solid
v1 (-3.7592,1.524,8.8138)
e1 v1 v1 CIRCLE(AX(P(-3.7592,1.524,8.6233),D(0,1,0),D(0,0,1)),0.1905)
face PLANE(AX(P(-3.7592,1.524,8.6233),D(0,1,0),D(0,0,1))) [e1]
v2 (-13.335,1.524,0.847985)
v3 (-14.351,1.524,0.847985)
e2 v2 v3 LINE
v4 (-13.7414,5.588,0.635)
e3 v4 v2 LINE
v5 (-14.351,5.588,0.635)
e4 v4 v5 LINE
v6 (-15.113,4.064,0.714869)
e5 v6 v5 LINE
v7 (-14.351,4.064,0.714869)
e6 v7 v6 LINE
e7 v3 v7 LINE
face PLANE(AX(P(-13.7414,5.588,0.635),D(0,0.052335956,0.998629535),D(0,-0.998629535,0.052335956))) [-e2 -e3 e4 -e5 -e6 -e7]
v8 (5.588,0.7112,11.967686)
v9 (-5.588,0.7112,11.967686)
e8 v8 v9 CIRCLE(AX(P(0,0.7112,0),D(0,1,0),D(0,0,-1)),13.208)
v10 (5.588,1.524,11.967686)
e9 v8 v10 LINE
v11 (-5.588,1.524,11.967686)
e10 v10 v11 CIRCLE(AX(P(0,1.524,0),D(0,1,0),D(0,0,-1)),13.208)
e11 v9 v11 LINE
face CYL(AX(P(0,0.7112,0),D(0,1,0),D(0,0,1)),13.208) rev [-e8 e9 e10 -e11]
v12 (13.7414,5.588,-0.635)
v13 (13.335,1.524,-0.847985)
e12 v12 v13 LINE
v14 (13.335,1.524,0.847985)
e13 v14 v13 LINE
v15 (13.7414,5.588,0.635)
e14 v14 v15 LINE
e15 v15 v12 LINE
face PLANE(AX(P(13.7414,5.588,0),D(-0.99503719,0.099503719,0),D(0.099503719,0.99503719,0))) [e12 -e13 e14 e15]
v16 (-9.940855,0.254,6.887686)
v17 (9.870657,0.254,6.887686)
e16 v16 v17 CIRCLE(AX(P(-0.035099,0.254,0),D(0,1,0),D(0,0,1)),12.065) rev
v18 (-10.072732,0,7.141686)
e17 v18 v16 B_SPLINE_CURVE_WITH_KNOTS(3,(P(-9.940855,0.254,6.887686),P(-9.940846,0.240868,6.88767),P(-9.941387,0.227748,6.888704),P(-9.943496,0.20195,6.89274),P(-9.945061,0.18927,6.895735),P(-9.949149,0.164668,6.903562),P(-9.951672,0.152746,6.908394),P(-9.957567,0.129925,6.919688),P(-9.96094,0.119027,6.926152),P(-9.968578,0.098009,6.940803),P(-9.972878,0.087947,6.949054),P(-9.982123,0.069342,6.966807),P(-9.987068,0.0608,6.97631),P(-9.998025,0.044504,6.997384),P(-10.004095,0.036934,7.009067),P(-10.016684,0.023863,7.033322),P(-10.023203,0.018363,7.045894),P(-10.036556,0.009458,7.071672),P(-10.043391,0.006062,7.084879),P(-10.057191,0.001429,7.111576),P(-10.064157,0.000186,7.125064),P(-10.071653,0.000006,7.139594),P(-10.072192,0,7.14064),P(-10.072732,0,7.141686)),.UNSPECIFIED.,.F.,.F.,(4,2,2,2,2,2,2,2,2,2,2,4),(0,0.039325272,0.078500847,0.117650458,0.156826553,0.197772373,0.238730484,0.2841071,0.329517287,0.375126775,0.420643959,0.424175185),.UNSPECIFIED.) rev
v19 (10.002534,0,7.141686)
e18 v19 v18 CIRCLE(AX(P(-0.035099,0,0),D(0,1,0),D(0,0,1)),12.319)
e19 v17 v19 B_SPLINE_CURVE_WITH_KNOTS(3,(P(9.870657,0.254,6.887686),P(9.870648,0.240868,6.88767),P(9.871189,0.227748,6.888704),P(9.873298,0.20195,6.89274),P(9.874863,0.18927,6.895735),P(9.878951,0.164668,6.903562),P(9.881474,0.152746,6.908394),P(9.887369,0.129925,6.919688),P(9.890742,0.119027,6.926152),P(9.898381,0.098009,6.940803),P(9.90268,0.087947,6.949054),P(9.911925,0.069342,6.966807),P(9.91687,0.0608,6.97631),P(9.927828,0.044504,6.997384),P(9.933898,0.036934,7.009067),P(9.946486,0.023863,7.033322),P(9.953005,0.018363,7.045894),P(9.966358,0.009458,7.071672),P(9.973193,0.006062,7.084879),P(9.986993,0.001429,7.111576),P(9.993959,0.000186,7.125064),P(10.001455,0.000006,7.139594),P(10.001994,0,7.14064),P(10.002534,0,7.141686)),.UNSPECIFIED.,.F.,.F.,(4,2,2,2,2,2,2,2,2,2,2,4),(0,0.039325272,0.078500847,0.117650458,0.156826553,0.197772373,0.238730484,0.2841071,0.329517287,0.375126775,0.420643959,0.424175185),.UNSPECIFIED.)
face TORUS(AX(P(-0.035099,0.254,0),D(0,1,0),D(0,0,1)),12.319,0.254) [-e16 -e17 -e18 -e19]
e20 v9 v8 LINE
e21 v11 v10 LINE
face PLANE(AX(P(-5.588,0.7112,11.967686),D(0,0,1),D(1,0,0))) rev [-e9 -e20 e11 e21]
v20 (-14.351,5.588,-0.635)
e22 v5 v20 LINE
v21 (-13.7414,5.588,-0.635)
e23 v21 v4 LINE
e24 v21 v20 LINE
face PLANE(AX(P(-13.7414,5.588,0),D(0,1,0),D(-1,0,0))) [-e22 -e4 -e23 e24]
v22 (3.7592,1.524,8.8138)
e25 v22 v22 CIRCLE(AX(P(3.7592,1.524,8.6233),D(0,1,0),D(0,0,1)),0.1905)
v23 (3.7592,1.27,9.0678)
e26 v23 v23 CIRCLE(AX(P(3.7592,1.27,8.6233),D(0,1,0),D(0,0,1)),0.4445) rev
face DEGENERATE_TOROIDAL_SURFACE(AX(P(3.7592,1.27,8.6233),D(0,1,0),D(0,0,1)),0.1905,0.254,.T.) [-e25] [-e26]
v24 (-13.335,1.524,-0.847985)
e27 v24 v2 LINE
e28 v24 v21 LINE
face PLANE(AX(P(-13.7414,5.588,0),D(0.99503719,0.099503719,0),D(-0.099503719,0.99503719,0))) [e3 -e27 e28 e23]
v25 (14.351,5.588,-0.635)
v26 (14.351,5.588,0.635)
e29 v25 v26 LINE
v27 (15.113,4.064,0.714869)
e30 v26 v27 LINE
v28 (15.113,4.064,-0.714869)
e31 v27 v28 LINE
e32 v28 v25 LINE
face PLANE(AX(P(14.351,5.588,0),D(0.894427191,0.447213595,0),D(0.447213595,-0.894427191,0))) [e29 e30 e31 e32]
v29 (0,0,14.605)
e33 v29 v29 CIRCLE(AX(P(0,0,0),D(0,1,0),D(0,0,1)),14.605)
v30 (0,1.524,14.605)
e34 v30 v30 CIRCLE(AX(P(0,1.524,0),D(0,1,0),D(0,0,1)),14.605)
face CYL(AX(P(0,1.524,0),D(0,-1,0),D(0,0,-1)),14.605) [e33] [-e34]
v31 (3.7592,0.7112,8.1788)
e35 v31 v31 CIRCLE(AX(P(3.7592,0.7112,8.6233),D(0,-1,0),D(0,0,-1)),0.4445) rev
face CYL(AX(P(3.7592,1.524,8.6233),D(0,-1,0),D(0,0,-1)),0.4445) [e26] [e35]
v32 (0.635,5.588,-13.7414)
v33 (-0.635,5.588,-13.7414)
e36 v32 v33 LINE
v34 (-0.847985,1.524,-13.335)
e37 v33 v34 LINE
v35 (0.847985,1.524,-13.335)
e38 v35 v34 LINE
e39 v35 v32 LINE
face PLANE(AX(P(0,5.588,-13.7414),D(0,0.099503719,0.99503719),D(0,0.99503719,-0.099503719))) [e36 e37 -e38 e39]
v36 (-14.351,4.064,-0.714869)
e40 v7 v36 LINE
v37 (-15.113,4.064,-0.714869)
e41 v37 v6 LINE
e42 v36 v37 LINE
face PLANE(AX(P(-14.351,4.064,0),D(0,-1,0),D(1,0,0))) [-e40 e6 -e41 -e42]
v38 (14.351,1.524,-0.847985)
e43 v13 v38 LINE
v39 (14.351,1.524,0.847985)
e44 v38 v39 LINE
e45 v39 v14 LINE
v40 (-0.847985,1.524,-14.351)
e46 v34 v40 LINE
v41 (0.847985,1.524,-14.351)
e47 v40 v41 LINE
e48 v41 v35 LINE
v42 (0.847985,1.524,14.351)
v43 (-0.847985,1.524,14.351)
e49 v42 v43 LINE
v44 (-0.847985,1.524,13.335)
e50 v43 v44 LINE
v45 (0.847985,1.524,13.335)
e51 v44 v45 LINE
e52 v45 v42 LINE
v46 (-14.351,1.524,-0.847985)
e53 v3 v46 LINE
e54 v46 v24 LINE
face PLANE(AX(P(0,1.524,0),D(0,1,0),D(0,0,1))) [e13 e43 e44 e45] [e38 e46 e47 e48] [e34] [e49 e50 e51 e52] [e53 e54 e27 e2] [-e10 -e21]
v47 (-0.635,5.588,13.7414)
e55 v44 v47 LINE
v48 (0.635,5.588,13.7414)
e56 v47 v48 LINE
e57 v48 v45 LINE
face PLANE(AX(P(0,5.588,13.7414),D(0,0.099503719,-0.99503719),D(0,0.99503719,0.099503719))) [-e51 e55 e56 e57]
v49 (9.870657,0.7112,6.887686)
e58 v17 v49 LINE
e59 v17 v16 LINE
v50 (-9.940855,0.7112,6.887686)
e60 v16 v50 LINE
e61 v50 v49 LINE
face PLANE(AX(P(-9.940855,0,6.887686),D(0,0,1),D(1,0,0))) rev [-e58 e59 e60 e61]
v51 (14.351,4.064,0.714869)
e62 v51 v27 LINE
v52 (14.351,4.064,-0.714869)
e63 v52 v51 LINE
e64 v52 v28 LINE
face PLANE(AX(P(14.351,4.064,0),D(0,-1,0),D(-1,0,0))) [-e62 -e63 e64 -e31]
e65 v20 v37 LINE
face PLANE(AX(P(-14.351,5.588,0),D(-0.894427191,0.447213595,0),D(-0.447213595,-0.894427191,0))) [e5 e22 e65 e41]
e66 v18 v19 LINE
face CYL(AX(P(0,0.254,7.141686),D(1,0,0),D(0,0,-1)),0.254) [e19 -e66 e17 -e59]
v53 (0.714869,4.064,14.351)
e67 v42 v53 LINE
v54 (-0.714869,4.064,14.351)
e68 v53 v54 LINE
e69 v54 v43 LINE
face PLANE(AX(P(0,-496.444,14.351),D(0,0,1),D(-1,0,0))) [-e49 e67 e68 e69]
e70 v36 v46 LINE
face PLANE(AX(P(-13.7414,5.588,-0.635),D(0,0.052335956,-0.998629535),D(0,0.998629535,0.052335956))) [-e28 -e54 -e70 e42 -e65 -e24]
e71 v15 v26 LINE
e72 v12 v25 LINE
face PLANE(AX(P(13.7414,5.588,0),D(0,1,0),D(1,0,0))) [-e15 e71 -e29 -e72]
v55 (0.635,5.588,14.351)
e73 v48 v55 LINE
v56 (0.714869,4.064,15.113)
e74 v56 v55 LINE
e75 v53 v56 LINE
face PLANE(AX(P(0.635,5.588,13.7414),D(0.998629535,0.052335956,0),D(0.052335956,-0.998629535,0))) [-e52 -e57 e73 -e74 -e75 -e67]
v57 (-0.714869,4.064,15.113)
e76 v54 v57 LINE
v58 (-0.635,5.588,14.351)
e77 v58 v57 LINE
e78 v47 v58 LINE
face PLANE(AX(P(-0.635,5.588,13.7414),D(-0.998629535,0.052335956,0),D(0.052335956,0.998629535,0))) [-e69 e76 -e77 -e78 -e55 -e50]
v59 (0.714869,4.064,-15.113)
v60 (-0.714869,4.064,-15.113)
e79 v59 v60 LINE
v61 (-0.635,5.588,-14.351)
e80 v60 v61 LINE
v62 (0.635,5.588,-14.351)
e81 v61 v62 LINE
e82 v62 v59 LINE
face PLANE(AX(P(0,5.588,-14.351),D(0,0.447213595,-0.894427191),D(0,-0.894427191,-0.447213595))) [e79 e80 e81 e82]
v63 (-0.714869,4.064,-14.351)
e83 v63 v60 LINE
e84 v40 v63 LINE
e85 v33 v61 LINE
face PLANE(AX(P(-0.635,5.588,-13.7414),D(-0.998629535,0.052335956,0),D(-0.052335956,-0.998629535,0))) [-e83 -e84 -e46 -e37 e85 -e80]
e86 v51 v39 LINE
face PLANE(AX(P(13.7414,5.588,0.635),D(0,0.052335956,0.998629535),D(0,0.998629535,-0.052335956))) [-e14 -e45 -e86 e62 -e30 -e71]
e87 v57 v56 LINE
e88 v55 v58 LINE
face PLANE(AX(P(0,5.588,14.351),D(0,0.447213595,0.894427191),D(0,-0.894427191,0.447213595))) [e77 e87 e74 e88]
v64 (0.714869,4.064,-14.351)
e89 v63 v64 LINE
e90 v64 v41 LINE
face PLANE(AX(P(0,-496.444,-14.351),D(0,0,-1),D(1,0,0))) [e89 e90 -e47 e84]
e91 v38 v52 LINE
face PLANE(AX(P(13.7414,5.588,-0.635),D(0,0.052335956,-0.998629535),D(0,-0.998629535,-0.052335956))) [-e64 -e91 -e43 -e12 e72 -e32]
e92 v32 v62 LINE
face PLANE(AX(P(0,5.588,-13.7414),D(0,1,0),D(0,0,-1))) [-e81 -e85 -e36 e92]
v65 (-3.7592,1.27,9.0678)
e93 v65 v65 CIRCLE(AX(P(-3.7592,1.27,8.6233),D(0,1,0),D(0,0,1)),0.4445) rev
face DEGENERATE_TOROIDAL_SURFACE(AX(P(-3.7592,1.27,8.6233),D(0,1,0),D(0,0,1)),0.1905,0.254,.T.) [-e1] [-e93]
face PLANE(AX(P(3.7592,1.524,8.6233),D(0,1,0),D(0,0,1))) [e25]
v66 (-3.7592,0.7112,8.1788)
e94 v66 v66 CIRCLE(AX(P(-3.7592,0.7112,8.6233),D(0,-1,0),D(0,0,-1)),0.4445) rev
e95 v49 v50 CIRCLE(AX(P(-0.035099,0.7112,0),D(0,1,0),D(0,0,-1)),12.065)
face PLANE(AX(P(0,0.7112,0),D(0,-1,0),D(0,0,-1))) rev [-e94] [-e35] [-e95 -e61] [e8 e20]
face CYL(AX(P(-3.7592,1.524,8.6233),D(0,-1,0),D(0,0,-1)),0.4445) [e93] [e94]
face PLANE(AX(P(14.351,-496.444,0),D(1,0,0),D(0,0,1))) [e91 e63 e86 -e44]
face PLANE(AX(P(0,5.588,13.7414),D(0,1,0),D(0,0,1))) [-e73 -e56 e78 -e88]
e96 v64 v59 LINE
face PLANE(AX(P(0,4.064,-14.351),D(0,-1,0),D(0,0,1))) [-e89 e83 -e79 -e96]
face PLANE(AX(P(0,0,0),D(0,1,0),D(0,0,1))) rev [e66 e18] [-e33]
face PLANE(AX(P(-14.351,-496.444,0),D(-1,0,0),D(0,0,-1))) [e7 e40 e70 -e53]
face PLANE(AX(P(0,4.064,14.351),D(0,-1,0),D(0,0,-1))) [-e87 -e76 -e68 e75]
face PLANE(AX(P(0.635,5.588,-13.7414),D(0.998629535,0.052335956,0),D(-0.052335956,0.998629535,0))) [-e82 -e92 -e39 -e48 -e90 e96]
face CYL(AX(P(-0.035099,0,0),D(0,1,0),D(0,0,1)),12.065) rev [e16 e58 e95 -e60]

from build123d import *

# Parameters (mm, degrees)
SKETCH1_R           = 14.605
BOSS_EXTRUDE1_DEPTH = 1.524
CUT_EXTRUDE1_DEPTH  = 0.8128
SKETCH4_R           = 0.4445
BOSS_EXTRUDE2_DEPTH = 0.8128
CUT_EXTRUDE2_DEPTH  = 21.670575557
FILLET1_R           = 0.254
FILLET3_R           = 0.254
SNAP_START          = 13.7414
SNAP_HOOK1_DEPTH    = 0.6096
SNAP_START_2        = -0.714869456
SNAP_HOOK1_2_DEPTH  = 1.429738912
SNAP_START_3        = -0.847985215
SNAP_HOOK1_3_DEPTH  = 1.69597043
SNAP_START_4        = 12
SNAP_HOOK1_4_DEPTH  = 4
CIRPATTERN1_COUNT   = 4


with BuildPart() as part:
    # Sketch1 → Boss-Extrude1 (new body)
    with BuildSketch(Plane(origin=(0, 0, 0), x_dir=(1, 0, 0), z_dir=(0, 1, 0))):
        with Locations(Location((0, 0, 0), (0, 0, 270))):
            Circle(SKETCH1_R)
    extrude(amount=BOSS_EXTRUDE1_DEPTH)

    # Sketch3 → Cut-Extrude1 (cut)
    with BuildSketch(Plane(origin=(0, 1.524, 0), x_dir=(1, 0, 0), z_dir=(0, 1, 0))):
        with BuildLine():
            Line((-5.588, -11.967686493), (5.588, -11.967686493))
            ThreePointArc((5.588, -11.967686493), (0, 13.208), (-5.588, -11.967686493))
        make_face()
    extrude(amount=-CUT_EXTRUDE1_DEPTH, mode=Mode.SUBTRACT)

    # Sketch4 → Boss-Extrude2 (add)
    with BuildSketch(Plane(origin=(0, 0.7112, 0), x_dir=(1, 0, 0), z_dir=(0, 1, 0))):
        with Locations(Location((-3.7592, -8.6233, 0), (0, 0, 90))):
            Circle(SKETCH4_R)
        with Locations(Location((3.7592, -8.6233, 0), (0, 0, 90))):
            Circle(SKETCH4_R)
    extrude(amount=BOSS_EXTRUDE2_DEPTH)

    # Sketch5 → Cut-Extrude2 (cut, through all)
    with BuildSketch(Plane(origin=(0, 0.7112, 0), x_dir=(1, 0, 0), z_dir=(0, 1, 0))):
        with BuildLine():
            Line((-9.940854815, -6.887686493), (9.870656967, -6.887686493))
            ThreePointArc((9.870656967, -6.887686493), (-0.035098924, 12.065), (-9.940854815, -6.887686493))
        make_face()
    extrude(amount=-CUT_EXTRUDE2_DEPTH, mode=Mode.SUBTRACT)

    # Fillet1
    fillet1_edges = [part.edges().sort_by_distance(p)[0] for p in [
        (-0.035098924, 0, -12.065),
        (-0.035098924, 0, 6.887686493),
    ]]
    fillet(fillet1_edges, radius=FILLET1_R)

    # Fillet3
    fillet3_edges = [part.edges().sort_by_distance(p)[0] for p in [
        (-3.7592, 1.524, 9.0678),
        (3.7592, 1.524, 9.0678),
    ]]
    fillet(fillet3_edges, radius=FILLET3_R)

    # Snap Hook1: read off the stored shape, not the designer's step
    # Snap Hook1 outline → Snap Hook1 (add)
    with BuildSketch(Plane.XY.offset(SNAP_START)):
        Polygon((-0.847985215, 1.524), (0.847985215, 1.524), (0.635, 5.588), (-0.635, 5.588), align=None)
    snap_hook1 = extrude(amount=SNAP_HOOK1_DEPTH)

    # Snap Hook1 2 outline → Snap Hook1 2 (add)
    with BuildSketch(Plane.YZ.offset(SNAP_START_2)):
        Polygon((1.524, 13.7414), (1.524, 13.335), (5.588, 13.7414), align=None)
        Polygon((4.064, 15.113), (4.064, 14.351), (5.588, 14.351), align=None)
    snap_hook1_2 = extrude(amount=SNAP_HOOK1_2_DEPTH)

    # Snap Hook1 3 outline → Snap Hook1 3 (add)
    with BuildSketch(Plane.YZ.offset(SNAP_START_3)):
        Polygon((1.524, 13.7414), (1.524, 13.335), (5.588, 13.7414), align=None)
    snap_hook1_3 = extrude(amount=SNAP_HOOK1_3_DEPTH)

    # Snap Hook1 4 outline → Snap Hook1 4 (cut)
    with BuildSketch(Plane.XY.offset(SNAP_START_4)):
        Polygon((0.847985215, 1.524), (0.847985215, 7), (0.561000216, 7), (0.635, 5.588), align=None)
        Polygon((-0.635, 5.588), (-0.561000216, 7), (-0.847985215, 7), (-0.847985215, 1.524), align=None)
    snap_hook1_4 = extrude(amount=SNAP_HOOK1_4_DEPTH, mode=Mode.SUBTRACT)

    # CirPattern1: Snap Hook1, Snap Hook1 2, Snap Hook1 3, Snap Hook1 4 ×4 about axis
    cirpattern1_axis = Axis((0, 1.524, 0), (0, 1, 0))
    add([snap_hook1.rotate(cirpattern1_axis, i * 360 / CIRPATTERN1_COUNT) for i in range(1, CIRPATTERN1_COUNT)])
    add([snap_hook1_2.rotate(cirpattern1_axis, i * 360 / CIRPATTERN1_COUNT) for i in range(1, CIRPATTERN1_COUNT)])
    add([snap_hook1_3.rotate(cirpattern1_axis, i * 360 / CIRPATTERN1_COUNT) for i in range(1, CIRPATTERN1_COUNT)])
    add([snap_hook1_4.rotate(cirpattern1_axis, i * 360 / CIRPATTERN1_COUNT) for i in range(1, CIRPATTERN1_COUNT)], mode=Mode.SUBTRACT)


solid = part.part
